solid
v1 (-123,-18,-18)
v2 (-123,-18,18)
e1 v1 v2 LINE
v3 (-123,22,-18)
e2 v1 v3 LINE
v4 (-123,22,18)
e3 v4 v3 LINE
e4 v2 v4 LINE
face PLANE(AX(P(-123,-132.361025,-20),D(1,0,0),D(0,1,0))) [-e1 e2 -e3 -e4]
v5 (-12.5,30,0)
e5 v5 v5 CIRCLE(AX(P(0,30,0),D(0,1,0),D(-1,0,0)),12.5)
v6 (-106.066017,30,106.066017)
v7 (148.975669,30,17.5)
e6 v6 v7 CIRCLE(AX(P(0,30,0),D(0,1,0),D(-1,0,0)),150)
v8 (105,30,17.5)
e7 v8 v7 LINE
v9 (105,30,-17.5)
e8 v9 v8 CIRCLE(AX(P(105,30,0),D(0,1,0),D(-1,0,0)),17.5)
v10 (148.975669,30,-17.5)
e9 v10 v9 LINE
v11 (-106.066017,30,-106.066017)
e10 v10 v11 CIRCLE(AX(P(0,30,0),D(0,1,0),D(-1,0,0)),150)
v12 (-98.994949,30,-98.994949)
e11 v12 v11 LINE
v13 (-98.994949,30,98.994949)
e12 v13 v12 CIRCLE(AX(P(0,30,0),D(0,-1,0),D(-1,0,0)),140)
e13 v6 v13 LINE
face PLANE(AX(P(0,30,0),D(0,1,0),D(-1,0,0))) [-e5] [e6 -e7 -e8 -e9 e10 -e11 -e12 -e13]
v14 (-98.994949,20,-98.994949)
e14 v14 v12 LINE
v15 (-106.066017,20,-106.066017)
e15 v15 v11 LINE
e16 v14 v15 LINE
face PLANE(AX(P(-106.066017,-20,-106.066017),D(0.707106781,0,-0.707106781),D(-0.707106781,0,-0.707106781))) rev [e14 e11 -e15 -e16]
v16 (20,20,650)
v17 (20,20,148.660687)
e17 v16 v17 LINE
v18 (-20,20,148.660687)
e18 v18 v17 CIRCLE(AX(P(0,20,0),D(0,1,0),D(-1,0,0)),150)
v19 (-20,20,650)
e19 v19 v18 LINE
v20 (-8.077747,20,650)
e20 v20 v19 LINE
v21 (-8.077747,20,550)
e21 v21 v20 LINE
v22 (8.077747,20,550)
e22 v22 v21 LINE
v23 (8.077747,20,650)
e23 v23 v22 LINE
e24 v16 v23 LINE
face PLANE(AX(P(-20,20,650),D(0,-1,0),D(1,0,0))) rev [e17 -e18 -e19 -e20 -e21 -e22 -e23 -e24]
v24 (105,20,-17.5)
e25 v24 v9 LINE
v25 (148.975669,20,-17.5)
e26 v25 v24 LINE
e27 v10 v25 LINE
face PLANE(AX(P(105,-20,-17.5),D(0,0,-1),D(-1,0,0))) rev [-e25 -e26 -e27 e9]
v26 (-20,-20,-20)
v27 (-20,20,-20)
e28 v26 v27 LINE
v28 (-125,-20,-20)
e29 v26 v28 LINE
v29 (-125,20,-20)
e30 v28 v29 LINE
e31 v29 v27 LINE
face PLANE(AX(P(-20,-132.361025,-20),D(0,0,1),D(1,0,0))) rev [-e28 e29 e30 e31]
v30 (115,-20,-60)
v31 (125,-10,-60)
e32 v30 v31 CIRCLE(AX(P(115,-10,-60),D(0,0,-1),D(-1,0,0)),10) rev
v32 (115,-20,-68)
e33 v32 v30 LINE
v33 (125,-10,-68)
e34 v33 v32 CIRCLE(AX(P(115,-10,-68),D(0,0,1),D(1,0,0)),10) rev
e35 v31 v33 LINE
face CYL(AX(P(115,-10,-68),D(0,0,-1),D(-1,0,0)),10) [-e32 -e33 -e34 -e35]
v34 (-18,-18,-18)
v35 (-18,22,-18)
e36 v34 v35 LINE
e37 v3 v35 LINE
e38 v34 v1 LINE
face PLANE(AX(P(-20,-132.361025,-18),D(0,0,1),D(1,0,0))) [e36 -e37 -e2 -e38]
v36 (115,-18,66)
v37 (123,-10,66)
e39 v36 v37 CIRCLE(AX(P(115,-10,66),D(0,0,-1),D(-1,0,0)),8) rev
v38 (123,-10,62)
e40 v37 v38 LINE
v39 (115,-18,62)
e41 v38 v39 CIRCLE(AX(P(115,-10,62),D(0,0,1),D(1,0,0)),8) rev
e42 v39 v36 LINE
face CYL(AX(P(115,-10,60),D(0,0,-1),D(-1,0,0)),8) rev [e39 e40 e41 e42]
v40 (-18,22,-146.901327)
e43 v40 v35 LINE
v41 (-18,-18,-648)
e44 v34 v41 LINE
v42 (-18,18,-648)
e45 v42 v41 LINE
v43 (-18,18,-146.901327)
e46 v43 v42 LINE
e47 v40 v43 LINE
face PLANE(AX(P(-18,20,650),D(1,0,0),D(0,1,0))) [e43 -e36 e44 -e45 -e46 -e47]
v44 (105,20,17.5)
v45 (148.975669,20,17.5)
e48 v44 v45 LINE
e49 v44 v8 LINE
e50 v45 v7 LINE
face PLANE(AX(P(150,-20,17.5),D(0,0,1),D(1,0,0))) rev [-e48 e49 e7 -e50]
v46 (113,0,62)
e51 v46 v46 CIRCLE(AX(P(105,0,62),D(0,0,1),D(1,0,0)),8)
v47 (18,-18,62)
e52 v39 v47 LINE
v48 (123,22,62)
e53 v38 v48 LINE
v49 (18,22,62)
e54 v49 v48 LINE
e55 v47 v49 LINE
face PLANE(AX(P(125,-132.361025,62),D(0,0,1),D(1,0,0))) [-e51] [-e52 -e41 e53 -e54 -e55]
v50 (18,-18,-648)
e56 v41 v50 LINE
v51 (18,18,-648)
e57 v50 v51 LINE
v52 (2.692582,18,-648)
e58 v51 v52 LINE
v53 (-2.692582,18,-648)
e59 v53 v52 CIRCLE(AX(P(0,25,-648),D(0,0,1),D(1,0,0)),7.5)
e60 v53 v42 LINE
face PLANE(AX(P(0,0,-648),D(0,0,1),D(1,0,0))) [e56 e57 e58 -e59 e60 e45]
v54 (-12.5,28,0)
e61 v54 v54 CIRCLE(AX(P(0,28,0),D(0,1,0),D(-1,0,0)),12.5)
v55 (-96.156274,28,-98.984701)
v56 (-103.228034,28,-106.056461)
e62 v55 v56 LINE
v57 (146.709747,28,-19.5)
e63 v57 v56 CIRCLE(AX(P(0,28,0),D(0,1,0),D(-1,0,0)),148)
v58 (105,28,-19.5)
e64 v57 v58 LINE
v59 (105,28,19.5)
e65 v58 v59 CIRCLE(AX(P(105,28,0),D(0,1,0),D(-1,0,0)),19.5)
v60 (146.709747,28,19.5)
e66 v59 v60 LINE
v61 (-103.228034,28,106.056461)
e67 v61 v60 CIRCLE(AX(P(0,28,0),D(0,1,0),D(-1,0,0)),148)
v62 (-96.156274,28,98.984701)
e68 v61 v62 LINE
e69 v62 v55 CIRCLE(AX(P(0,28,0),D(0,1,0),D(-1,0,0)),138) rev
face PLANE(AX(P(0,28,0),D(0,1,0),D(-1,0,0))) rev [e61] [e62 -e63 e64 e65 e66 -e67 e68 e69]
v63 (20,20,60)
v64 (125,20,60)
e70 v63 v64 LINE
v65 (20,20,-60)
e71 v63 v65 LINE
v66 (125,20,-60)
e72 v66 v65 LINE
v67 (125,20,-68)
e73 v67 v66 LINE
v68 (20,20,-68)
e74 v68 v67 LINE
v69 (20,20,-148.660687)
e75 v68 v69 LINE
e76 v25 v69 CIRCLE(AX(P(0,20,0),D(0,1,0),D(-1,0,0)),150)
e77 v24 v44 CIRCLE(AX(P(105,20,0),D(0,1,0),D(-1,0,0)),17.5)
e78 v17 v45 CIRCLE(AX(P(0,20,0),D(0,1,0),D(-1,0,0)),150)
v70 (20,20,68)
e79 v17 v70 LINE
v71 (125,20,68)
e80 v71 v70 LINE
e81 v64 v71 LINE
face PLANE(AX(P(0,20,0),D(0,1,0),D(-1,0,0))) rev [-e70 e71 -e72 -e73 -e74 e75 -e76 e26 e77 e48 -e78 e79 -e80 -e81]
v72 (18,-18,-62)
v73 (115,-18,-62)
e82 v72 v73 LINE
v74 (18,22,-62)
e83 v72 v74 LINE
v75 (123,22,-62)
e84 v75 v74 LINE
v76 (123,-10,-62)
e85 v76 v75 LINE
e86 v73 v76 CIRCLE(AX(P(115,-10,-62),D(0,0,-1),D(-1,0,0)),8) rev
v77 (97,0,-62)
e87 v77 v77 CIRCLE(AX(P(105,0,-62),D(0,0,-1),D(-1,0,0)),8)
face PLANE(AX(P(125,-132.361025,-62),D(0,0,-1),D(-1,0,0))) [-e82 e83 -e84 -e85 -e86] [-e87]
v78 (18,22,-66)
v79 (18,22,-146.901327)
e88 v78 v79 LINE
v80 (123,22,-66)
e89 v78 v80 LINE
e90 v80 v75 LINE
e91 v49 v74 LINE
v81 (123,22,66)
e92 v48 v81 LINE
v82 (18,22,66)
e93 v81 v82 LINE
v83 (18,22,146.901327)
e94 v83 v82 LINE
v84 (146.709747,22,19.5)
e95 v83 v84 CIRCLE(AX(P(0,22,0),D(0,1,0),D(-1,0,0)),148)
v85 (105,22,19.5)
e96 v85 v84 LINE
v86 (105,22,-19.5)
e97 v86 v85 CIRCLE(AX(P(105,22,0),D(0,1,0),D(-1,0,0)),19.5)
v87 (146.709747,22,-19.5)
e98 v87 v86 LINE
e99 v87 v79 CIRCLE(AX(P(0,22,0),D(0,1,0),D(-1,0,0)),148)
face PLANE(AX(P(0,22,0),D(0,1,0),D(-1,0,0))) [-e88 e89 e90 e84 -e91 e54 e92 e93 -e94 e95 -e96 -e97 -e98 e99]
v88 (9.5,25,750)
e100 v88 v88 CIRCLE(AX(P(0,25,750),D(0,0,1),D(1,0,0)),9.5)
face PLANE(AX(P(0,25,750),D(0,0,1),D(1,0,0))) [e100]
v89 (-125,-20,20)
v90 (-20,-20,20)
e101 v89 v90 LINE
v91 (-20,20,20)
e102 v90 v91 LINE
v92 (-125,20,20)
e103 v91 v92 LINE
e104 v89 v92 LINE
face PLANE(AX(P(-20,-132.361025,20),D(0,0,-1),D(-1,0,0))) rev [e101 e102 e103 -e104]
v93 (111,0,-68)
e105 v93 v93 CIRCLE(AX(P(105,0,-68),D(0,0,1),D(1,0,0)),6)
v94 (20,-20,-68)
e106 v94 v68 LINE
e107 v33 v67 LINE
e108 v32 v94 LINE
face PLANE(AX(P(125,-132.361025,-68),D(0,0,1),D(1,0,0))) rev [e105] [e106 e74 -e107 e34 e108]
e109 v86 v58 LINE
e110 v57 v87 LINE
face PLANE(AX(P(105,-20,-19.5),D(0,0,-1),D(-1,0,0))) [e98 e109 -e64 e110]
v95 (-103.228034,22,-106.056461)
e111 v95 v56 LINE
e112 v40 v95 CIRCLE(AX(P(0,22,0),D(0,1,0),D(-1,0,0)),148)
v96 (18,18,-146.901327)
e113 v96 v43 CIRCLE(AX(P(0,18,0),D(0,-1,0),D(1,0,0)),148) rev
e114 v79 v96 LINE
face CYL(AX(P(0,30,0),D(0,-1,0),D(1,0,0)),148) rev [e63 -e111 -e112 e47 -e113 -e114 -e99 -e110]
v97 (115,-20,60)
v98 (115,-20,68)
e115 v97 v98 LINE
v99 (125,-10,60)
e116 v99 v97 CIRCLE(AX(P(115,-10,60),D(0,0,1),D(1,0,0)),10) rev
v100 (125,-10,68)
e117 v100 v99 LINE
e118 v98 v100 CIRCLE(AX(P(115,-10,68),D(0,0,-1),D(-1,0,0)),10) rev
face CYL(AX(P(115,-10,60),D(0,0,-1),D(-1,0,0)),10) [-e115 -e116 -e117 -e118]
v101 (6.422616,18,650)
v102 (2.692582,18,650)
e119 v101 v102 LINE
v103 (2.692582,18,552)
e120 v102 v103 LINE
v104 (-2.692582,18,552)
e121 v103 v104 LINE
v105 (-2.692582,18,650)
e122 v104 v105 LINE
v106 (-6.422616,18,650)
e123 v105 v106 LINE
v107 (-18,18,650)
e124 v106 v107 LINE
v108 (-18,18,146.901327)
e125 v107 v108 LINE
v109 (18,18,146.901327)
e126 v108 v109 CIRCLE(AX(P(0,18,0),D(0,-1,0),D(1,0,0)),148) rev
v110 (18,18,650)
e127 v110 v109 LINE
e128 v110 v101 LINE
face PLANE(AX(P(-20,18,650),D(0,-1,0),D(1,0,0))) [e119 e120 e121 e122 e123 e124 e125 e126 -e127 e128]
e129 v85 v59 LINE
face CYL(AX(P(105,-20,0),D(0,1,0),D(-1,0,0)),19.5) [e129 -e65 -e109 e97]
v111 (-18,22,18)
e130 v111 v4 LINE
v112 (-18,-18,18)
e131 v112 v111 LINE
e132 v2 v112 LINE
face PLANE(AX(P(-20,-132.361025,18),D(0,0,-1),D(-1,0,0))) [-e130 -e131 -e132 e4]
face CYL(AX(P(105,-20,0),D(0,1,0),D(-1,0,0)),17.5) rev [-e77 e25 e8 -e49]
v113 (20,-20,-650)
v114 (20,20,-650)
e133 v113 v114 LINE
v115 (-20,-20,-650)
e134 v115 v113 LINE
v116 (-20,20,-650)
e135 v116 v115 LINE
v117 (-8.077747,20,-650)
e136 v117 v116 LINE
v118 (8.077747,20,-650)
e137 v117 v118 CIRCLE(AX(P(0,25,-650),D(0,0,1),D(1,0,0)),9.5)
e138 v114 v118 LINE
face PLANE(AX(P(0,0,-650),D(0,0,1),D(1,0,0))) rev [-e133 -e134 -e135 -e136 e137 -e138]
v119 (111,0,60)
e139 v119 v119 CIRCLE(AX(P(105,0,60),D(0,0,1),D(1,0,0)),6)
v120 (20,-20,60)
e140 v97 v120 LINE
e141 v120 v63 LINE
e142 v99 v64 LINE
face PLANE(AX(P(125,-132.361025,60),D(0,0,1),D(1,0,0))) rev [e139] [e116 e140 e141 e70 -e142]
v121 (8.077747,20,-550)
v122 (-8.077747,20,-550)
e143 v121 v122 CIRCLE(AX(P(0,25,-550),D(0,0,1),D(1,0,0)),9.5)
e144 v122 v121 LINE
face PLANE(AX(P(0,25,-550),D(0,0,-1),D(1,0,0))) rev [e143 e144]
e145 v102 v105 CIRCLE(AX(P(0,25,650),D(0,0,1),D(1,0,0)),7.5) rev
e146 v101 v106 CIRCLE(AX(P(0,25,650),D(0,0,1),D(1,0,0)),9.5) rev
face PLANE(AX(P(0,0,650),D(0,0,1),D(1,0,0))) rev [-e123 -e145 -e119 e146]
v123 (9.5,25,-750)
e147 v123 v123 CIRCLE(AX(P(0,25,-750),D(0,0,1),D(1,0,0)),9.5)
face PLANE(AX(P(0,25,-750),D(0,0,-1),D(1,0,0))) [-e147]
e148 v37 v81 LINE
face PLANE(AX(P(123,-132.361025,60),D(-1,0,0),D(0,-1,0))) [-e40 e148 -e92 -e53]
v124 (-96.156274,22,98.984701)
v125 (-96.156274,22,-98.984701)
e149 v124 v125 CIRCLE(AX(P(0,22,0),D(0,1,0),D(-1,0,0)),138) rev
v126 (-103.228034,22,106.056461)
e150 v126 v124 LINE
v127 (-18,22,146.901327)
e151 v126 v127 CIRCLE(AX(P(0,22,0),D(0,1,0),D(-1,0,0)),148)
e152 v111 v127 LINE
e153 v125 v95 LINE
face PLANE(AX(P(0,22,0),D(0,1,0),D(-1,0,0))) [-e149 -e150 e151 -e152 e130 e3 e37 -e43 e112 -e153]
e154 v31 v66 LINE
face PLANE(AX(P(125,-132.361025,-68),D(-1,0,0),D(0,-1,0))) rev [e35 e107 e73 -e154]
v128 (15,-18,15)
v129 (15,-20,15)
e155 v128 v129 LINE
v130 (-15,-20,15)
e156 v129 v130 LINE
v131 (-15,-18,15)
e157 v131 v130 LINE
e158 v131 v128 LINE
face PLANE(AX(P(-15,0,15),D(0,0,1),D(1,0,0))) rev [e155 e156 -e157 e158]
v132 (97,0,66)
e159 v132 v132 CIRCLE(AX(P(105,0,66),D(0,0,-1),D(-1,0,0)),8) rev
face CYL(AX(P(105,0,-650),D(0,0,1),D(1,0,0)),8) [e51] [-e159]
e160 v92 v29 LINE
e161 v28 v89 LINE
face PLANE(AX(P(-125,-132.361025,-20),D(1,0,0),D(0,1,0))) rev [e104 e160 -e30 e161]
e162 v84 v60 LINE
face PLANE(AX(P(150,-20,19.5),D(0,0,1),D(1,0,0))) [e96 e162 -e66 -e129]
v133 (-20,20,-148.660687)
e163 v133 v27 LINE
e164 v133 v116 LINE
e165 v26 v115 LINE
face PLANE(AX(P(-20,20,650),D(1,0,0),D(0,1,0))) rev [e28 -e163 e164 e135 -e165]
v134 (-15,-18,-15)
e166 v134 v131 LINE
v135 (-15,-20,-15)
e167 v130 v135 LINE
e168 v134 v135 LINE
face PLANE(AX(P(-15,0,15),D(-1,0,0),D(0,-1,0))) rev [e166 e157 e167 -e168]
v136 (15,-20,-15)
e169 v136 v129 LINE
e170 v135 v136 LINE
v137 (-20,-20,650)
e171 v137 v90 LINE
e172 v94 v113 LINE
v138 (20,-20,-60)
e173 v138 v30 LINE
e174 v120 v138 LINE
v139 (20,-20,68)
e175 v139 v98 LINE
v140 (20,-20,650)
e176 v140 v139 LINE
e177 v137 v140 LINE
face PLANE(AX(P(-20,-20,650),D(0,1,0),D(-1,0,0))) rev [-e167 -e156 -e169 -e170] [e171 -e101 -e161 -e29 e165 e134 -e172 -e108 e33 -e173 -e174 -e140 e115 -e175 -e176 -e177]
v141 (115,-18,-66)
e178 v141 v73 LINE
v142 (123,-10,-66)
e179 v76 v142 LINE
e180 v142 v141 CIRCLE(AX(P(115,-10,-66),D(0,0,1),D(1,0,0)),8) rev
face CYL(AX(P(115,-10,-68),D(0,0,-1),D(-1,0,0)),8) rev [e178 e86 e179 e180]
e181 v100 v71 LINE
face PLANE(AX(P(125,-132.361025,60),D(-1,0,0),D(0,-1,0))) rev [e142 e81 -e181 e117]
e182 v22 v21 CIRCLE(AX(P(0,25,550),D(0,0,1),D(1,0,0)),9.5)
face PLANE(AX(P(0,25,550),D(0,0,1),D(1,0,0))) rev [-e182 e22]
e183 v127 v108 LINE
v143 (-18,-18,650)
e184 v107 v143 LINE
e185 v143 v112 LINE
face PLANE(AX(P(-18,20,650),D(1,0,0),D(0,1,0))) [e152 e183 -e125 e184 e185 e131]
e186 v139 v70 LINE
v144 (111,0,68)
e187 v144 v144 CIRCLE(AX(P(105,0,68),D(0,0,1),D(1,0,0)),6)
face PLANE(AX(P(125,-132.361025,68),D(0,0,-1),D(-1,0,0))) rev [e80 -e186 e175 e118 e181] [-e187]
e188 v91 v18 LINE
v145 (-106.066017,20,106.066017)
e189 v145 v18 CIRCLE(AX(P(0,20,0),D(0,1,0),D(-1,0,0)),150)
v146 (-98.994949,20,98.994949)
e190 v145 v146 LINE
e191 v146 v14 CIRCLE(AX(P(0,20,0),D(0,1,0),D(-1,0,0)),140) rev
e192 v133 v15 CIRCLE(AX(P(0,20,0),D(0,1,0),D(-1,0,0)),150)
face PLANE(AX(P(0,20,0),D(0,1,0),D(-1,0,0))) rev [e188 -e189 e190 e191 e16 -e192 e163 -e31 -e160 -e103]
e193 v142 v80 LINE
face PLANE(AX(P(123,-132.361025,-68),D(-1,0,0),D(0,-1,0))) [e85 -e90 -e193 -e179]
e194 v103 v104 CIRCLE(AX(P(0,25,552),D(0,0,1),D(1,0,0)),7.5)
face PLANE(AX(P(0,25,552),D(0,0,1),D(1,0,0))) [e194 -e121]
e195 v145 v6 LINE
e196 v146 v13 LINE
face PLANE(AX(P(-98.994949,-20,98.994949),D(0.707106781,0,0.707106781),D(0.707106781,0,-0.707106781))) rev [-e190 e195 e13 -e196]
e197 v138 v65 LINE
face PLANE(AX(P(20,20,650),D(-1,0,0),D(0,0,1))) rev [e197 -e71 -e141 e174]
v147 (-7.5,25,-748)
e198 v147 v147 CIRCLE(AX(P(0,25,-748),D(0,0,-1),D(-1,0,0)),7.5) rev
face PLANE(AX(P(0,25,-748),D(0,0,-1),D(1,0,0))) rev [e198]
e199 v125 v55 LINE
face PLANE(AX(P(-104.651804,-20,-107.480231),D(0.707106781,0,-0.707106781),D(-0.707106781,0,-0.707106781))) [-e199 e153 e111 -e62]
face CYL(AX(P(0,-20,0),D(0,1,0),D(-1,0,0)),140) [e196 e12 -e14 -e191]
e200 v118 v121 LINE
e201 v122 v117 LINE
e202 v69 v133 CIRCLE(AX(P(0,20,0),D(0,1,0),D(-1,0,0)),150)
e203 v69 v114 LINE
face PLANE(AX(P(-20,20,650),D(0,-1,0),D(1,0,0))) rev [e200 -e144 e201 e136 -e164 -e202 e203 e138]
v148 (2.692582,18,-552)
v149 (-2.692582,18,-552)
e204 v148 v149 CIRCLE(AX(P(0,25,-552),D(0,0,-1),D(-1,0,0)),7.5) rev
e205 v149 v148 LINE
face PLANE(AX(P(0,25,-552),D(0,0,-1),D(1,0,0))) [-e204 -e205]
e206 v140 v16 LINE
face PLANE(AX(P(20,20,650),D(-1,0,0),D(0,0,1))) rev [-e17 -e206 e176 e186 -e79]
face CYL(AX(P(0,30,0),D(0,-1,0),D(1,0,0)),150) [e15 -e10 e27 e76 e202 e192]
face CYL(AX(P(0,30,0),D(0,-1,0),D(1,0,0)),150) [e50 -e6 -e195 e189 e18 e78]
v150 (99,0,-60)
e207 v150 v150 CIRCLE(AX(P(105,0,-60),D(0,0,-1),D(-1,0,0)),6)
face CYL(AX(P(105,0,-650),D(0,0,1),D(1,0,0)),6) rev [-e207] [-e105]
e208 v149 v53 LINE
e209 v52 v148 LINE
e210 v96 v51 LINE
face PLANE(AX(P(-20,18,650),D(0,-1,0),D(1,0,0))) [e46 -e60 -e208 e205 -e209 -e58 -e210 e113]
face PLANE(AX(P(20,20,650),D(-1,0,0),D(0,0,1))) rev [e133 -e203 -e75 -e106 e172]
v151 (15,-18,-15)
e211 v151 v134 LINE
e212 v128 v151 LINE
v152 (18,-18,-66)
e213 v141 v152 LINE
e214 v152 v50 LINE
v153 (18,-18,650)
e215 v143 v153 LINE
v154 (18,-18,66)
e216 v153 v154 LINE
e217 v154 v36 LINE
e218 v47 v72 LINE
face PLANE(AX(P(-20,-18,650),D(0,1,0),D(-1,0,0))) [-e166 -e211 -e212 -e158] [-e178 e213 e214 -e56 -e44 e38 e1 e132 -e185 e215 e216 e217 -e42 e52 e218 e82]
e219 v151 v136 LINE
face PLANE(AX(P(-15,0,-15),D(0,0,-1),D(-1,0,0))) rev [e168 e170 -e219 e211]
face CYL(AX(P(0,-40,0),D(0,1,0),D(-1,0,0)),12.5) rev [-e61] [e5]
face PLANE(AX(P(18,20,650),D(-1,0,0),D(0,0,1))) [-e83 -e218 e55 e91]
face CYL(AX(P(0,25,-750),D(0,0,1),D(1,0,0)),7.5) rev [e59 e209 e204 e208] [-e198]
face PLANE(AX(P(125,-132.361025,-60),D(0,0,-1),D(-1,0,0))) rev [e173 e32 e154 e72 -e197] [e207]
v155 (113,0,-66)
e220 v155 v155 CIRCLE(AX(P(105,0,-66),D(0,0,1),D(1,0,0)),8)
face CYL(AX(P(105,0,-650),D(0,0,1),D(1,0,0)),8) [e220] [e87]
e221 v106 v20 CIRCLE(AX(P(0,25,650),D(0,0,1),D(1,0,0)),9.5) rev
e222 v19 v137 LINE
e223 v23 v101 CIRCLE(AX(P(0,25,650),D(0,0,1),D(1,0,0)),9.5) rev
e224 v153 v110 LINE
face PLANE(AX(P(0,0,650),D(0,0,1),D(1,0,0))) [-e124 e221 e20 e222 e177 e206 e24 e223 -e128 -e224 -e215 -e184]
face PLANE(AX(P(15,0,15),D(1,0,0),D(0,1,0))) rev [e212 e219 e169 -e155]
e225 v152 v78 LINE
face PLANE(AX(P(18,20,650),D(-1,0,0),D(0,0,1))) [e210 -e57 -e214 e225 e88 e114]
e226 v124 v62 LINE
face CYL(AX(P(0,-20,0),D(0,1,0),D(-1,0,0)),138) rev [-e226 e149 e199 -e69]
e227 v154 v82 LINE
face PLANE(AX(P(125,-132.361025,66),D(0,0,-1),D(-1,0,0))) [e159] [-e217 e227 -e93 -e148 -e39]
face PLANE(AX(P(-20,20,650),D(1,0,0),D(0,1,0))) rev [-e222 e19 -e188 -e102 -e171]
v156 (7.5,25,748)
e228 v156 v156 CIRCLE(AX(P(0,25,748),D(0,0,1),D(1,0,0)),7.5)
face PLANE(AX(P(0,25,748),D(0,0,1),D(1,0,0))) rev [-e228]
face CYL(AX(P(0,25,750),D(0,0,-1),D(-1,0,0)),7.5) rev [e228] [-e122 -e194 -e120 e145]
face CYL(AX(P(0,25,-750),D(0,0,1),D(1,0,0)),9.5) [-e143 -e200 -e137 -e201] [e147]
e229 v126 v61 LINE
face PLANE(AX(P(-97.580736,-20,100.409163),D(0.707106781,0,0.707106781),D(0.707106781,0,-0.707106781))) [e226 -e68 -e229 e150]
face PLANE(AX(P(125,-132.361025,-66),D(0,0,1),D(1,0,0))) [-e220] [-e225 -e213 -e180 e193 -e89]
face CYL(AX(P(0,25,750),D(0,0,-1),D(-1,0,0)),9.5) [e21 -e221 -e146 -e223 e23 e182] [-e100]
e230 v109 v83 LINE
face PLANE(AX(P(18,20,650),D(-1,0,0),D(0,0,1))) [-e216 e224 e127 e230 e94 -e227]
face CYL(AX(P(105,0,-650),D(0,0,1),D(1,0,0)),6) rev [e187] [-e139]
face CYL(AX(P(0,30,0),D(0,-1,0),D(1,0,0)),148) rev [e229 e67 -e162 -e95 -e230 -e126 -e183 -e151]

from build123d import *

# Parameters (mm, degrees)
SKETCH1_W            = 40
SKETCH1_H            = 40
BOSS_EXTRUDE1_DEPTH  = 650
BOSS_EXTRUDE2_START  = 550
SKETCH3_R            = 9.5
BOSS_EXTRUDE2_DEPTH  = 200
SKETCH8_R            = 150
BOSS_EXTRUDE3_DEPTH  = 10
SKETCH9_W            = 105
SKETCH9_H            = 8
SKETCH9_H_2          = 40
BOSS_EXTRUDE4_DEPTH  = 40
FILLET1_R            = 10
SKETCH10_R           = 6
CUT_EXTRUDE1_DEPTH   = 735.31209305
CUT_EXTRUDE2_DEPTH   = 767.485485838
CUT_EXTRUDE5_DEPTH   = 767.485485838
SHELL2_START         = -18
SHELL2_DEPTH         = 36
SHELL2_START_2       = 22
SHELL2_2_DEPTH       = 6
SHELL2_START_3       = 8.0000001
SHELL2_3_DEPTH       = 13.9999999
SHELL2_START_4       = -10
SHELL2_4_DEPTH       = 1.9999999
SHELL2_START_5       = -552
SHELL2_5_OUTLINE_W   = 36
SHELL2_5_OUTLINE_H   = 8
SHELL2_5_OUTLINE_H_2 = 16.0000002
SHELL2_5_DEPTH       = 1300
SHELL2_6_OUTLINE_W   = 105
SHELL2_6_OUTLINE_H   = 8
SHELL2_6_OUTLINE_H_2 = 16.0000002
SHELL2_6_DEPTH       = 36
SHELL2_START_6       = -748
SHELL2_7_OUTLINE_R   = 7.5
SHELL2_7_DEPTH       = 196
SHELL2_START_7       = 552
SHELL2_8_DEPTH       = 196
SHELL2_START_8       = -66
SHELL2_9_DEPTH       = 4
SHELL2_START_9       = 62
SHELL2_10_DEPTH      = 4
SKETCH12_R           = 12.5
CUT_EXTRUDE3_DEPTH   = 70
SKETCH13_W           = 30
SKETCH13_H           = 30
CUT_EXTRUDE4_DEPTH   = 20


with BuildPart() as part:
    # Sketch1 → Boss-Extrude1 (new, symmetric)
    with BuildSketch(Plane.XY):
        Rectangle(SKETCH1_W, SKETCH1_H)
    extrude(amount=BOSS_EXTRUDE1_DEPTH, both=True)

    # Sketch3 → Boss-Extrude2 (add)
    with BuildSketch(Plane.XY.offset(BOSS_EXTRUDE2_START)):
        with Locations(Location((0, 25, 0), (0, 0, 211.756863859))):
            Circle(SKETCH3_R)
    boss_extrude2 = extrude(amount=BOSS_EXTRUDE2_DEPTH)

    # Sketch8 → Boss-Extrude3 (add)
    with BuildSketch(Plane(origin=(0, 20, 0), x_dir=(1, 0, 0), z_dir=(0, 1, 0))):
        with Locations(Location((0, 0, 0), (0, 0, 277.662255661))):
            Circle(SKETCH8_R)
    extrude(amount=BOSS_EXTRUDE3_DEPTH)

    # Sketch9 → Boss-Extrude4 (add)
    with BuildSketch(Plane.XZ.offset(-20)):
        with Locations((72.5, -64)):
            Rectangle(SKETCH9_W, SKETCH9_H)
        with Locations((72.5, 64)):
            Rectangle(SKETCH9_W, SKETCH9_H)
        with Locations((-72.5, 0)):
            Rectangle(SKETCH9_W, SKETCH9_H_2)
    extrude(amount=BOSS_EXTRUDE4_DEPTH)

    # Fillet1
    fillet1_edges = [part.edges().sort_by_distance(p)[0] for p in [
        (125, -20, -64),
        (125, -20, 64),
    ]]
    fillet(fillet1_edges, radius=FILLET1_R)

    # Sketch10 → Cut-Extrude1 (cut, through all)
    with BuildSketch(Plane.XY.offset(68)):
        with Locations((105, 0)):
            Circle(SKETCH10_R)
    extrude(amount=-CUT_EXTRUDE1_DEPTH, mode=Mode.SUBTRACT)

    # Sketch11 → Cut-Extrude2 (cut, through all)
    with BuildSketch(Plane(origin=(0, 30, 0), x_dir=(1, 0, 0), z_dir=(0, 1, 0))):
        with BuildLine():
            Line((105, 17.5), (150, 17.5))
            Line((150, 17.5), (150, -17.5))
            Line((150, -17.5), (105, -17.5))
            ThreePointArc((105, -17.5), (87.5, 0), (105, 17.5))
        make_face()
    extrude(amount=-CUT_EXTRUDE2_DEPTH, mode=Mode.SUBTRACT)

    # Mirror1: Boss-Extrude2 across plane
    add(boss_extrude2.mirror(Plane.XY))

    # Sketch14 → Cut-Extrude5 (cut, through all)
    with BuildSketch(Plane(origin=(0, 30, 0), x_dir=(1, 0, 0), z_dir=(0, 1, 0))):
        with BuildLine():
            Line((-106.066017178, 106.066017178), (-98.994949366, 98.994949366))
            ThreePointArc((-98.994949366, 98.994949366), (-140, 0), (-98.994949366, -98.994949366))
            Line((-98.994949366, -98.994949366), (-106.066017178, -106.066017178))
            ThreePointArc((-106.066017178, -106.066017178), (-150, 0), (-106.066017178, 106.066017178))
        make_face()
    extrude(amount=-CUT_EXTRUDE5_DEPTH, mode=Mode.SUBTRACT)

    # Shell2: read off the stored shape, not the designer's step
    # Shell2 outline → Shell2 (cut)
    with BuildSketch(Plane(origin=(0, 0, 0), x_dir=(1, 0, 0), z_dir=(0, 1, 0)).offset(SHELL2_START)):
        with BuildLine():
            Line((-18, 648), (-18, 146.901327428))
            ThreePointArc((-18, 146.901327428), (0, 148), (18, 146.901327428))
            Line((18, 146.901327428), (18, 648))
            Line((18, 648), (-18, 648))
        make_face()
        with BuildLine():
            ThreePointArc((18, -146.901327428), (0, -148), (-18, -146.901327428))
            Line((-18, -146.901327428), (-18, -650))
            Line((-18, -650), (18, -650))
            Line((18, -650), (18, -146.901327428))
        make_face()
    extrude(amount=SHELL2_DEPTH, mode=Mode.SUBTRACT)

    # Shell2 2 outline → Shell2 2 (cut)
    with BuildSketch(Plane(origin=(0, 0, 0), x_dir=(1, 0, 0), z_dir=(0, 1, 0)).offset(SHELL2_START_2)):
        with BuildLine():
            Line((-103.22803412, 106.056461245), (-96.156273779, 98.984700904))
            ThreePointArc((-96.156273779, 98.984700904), (-138, 0), (-96.156273779, -98.984700904))
            Line((-96.156273779, -98.984700904), (-103.22803412, -106.056461245))
            ThreePointArc((-103.22803412, -106.056461245), (48.432118419, -139.85109905), (146.709747461, -19.5))
            Line((146.709747461, -19.5), (105, -19.5))
            ThreePointArc((105, -19.5), (85.5, 0), (105, 19.5))
            Line((105, 19.5), (146.709747461, 19.5))
            ThreePointArc((146.709747461, 19.5), (48.432118419, 139.85109905), (-103.22803412, 106.056461245))
        make_face()
    extrude(amount=SHELL2_2_DEPTH, mode=Mode.SUBTRACT)

    # Shell2 3 outline → Shell2 3 (cut)
    with BuildSketch(Plane(origin=(0, 0, 0), x_dir=(1, 0, 0), z_dir=(0, 1, 0)).offset(SHELL2_START_3)):
        with BuildLine():
            ThreePointArc((18, 146.901327428), (0, 148), (-18, 146.901327428))
            Line((-18, 146.901327428), (-18, 18))
            Line((-18, 18), (-123, 18))
            Line((-123, 18), (-123, -18))
            Line((-123, -18), (-18, -18))
            Line((-18, -18), (-18, -146.901327428))
            ThreePointArc((-18, -146.901327428), (0, -148), (18, -146.901327428))
            Line((18, -146.901327428), (18, -66))
            Line((18, -66), (123, -66))
            Line((123, -66), (123, -62))
            Line((123, -62), (18, -62))
            Line((18, -62), (18, 62))
            Line((18, 62), (123, 62))
            Line((123, 62), (123, 66))
            Line((123, 66), (18, 66))
            Line((18, 66), (18, 146.901327428))
        make_face()
    extrude(amount=SHELL2_3_DEPTH, mode=Mode.SUBTRACT)

    # Shell2 4 outline → Shell2 4 (cut)
    with BuildSketch(Plane(origin=(0, 0, 0), x_dir=(1, 0, 0), z_dir=(0, 1, 0)).offset(SHELL2_START_4)):
        with BuildLine():
            ThreePointArc((18, 146.901327428), (0, 148), (-18, 146.901327428))
            Line((-18, 146.901327428), (-18, 18))
            Line((-18, 18), (-123, 18))
            Line((-123, 18), (-123, -18))
            Line((-123, -18), (-18, -18))
            Line((-18, -18), (-18, -146.901327428))
            ThreePointArc((-18, -146.901327428), (0, -148), (18, -146.901327428))
            Line((18, -146.901327428), (18, -66))
            Line((18, -66), (123, -66))
            Line((123, -66), (123, -62))
            Line((123, -62), (18, -62))
            Line((18, -62), (18, 62))
            Line((18, 62), (123, 62))
            Line((123, 62), (123, 66))
            Line((123, 66), (18, 66))
            Line((18, 66), (18, 146.901327428))
        make_face()
    extrude(amount=SHELL2_4_DEPTH, mode=Mode.SUBTRACT)

    # Shell2 5 outline → Shell2 5 (cut)
    with BuildSketch(Plane.XY.offset(SHELL2_START_5)):
        with Locations((0, -14)):
            Rectangle(SHELL2_5_OUTLINE_W, SHELL2_5_OUTLINE_H)
        Rectangle(SHELL2_5_OUTLINE_W, SHELL2_5_OUTLINE_H_2)
        with BuildLine():
            Line((2.692582404, 18), (-2.692582404, 18))
            ThreePointArc((-2.692582404, 18), (0, 17.5), (2.692582404, 18))
        make_face()
    extrude(amount=SHELL2_5_DEPTH, mode=Mode.SUBTRACT)

    # Shell2 6 outline → Shell2 6 (cut)
    with BuildSketch(Plane.XY.offset(SHELL2_START)):
        with Locations((-70.5, -14)):
            Rectangle(SHELL2_6_OUTLINE_W, SHELL2_6_OUTLINE_H)
        with Locations((-70.5, 0)):
            Rectangle(SHELL2_6_OUTLINE_W, SHELL2_6_OUTLINE_H_2)
    extrude(amount=SHELL2_6_DEPTH, mode=Mode.SUBTRACT)

    # Shell2 7 outline → Shell2 7 (cut)
    with BuildSketch(Plane.XY.offset(SHELL2_START_6)):
        with Locations((0, 25)):
            Circle(SHELL2_7_OUTLINE_R)
    extrude(amount=SHELL2_7_DEPTH, mode=Mode.SUBTRACT)

    # Shell2 8 outline → Shell2 8 (cut)
    with BuildSketch(Plane.XY.offset(SHELL2_START_7)):
        with BuildLine():
            ThreePointArc((2.692582404, 18), (0, 32.5), (-2.692582404, 18))
            Line((-2.692582404, 18), (2.692582404, 18))
        make_face()
    extrude(amount=SHELL2_8_DEPTH, mode=Mode.SUBTRACT)

    # Shell2 9 outline → Shell2 9 (cut)
    with BuildSketch(Plane.XY.offset(SHELL2_START_8)):
        with BuildLine():
            Line((18, -10), (18, -18))
            Line((18, -18), (115, -18))
            ThreePointArc((115, -18), (120.656854249, -15.656854249), (123, -10))
            Line((123, -10), (18, -10))
        make_face()
        with BuildLine():
            Line((18, 8.0000001), (18, -8.0000001))
            Line((18, -8.0000001), (105, -8))
            ThreePointArc((105, -8), (97, 0), (105, 8))
            Line((105, 8), (18, 8.0000001))
        make_face()
        with BuildLine():
            ThreePointArc((105, 8), (113, 0), (105, -8))
            Line((105, -8), (123, -8.0000001))
            Line((123, -8.0000001), (123, 8.0000001))
            Line((123, 8.0000001), (105, 8))
        make_face()
    extrude(amount=SHELL2_9_DEPTH, mode=Mode.SUBTRACT)

    # Shell2 10 outline → Shell2 10 (cut)
    with BuildSketch(Plane.XY.offset(SHELL2_START_9)):
        with BuildLine():
            Line((18, -10), (18, -18))
            Line((18, -18), (115, -18))
            ThreePointArc((115, -18), (120.656854249, -15.656854249), (123, -10))
            Line((123, -10), (18, -10))
        make_face()
        with BuildLine():
            Line((18, 8.0000001), (18, -8.0000001))
            Line((18, -8.0000001), (105, -8))
            ThreePointArc((105, -8), (97, 0), (105, 8))
            Line((105, 8), (18, 8.0000001))
        make_face()
        with BuildLine():
            ThreePointArc((105, 8), (113, 0), (105, -8))
            Line((105, -8), (123, -8.0000001))
            Line((123, -8.0000001), (123, 8.0000001))
            Line((123, 8.0000001), (105, 8))
        make_face()
    extrude(amount=SHELL2_10_DEPTH, mode=Mode.SUBTRACT)

    # Sketch12 → Cut-Extrude3 (cut)
    with BuildSketch(Plane(origin=(0, 30, 0), x_dir=(1, 0, 0), z_dir=(0, 1, 0))):
        with Locations(Location((0, 0, 0), (0, 0, 180))):
            Circle(SKETCH12_R)
    extrude(amount=-CUT_EXTRUDE3_DEPTH, mode=Mode.SUBTRACT)

    # Sketch13 → Cut-Extrude4 (cut)
    with BuildSketch(Plane.XZ.offset(20)):
        Rectangle(SKETCH13_W, SKETCH13_H)
    extrude(amount=-CUT_EXTRUDE4_DEPTH, mode=Mode.SUBTRACT)


solid = part.part
